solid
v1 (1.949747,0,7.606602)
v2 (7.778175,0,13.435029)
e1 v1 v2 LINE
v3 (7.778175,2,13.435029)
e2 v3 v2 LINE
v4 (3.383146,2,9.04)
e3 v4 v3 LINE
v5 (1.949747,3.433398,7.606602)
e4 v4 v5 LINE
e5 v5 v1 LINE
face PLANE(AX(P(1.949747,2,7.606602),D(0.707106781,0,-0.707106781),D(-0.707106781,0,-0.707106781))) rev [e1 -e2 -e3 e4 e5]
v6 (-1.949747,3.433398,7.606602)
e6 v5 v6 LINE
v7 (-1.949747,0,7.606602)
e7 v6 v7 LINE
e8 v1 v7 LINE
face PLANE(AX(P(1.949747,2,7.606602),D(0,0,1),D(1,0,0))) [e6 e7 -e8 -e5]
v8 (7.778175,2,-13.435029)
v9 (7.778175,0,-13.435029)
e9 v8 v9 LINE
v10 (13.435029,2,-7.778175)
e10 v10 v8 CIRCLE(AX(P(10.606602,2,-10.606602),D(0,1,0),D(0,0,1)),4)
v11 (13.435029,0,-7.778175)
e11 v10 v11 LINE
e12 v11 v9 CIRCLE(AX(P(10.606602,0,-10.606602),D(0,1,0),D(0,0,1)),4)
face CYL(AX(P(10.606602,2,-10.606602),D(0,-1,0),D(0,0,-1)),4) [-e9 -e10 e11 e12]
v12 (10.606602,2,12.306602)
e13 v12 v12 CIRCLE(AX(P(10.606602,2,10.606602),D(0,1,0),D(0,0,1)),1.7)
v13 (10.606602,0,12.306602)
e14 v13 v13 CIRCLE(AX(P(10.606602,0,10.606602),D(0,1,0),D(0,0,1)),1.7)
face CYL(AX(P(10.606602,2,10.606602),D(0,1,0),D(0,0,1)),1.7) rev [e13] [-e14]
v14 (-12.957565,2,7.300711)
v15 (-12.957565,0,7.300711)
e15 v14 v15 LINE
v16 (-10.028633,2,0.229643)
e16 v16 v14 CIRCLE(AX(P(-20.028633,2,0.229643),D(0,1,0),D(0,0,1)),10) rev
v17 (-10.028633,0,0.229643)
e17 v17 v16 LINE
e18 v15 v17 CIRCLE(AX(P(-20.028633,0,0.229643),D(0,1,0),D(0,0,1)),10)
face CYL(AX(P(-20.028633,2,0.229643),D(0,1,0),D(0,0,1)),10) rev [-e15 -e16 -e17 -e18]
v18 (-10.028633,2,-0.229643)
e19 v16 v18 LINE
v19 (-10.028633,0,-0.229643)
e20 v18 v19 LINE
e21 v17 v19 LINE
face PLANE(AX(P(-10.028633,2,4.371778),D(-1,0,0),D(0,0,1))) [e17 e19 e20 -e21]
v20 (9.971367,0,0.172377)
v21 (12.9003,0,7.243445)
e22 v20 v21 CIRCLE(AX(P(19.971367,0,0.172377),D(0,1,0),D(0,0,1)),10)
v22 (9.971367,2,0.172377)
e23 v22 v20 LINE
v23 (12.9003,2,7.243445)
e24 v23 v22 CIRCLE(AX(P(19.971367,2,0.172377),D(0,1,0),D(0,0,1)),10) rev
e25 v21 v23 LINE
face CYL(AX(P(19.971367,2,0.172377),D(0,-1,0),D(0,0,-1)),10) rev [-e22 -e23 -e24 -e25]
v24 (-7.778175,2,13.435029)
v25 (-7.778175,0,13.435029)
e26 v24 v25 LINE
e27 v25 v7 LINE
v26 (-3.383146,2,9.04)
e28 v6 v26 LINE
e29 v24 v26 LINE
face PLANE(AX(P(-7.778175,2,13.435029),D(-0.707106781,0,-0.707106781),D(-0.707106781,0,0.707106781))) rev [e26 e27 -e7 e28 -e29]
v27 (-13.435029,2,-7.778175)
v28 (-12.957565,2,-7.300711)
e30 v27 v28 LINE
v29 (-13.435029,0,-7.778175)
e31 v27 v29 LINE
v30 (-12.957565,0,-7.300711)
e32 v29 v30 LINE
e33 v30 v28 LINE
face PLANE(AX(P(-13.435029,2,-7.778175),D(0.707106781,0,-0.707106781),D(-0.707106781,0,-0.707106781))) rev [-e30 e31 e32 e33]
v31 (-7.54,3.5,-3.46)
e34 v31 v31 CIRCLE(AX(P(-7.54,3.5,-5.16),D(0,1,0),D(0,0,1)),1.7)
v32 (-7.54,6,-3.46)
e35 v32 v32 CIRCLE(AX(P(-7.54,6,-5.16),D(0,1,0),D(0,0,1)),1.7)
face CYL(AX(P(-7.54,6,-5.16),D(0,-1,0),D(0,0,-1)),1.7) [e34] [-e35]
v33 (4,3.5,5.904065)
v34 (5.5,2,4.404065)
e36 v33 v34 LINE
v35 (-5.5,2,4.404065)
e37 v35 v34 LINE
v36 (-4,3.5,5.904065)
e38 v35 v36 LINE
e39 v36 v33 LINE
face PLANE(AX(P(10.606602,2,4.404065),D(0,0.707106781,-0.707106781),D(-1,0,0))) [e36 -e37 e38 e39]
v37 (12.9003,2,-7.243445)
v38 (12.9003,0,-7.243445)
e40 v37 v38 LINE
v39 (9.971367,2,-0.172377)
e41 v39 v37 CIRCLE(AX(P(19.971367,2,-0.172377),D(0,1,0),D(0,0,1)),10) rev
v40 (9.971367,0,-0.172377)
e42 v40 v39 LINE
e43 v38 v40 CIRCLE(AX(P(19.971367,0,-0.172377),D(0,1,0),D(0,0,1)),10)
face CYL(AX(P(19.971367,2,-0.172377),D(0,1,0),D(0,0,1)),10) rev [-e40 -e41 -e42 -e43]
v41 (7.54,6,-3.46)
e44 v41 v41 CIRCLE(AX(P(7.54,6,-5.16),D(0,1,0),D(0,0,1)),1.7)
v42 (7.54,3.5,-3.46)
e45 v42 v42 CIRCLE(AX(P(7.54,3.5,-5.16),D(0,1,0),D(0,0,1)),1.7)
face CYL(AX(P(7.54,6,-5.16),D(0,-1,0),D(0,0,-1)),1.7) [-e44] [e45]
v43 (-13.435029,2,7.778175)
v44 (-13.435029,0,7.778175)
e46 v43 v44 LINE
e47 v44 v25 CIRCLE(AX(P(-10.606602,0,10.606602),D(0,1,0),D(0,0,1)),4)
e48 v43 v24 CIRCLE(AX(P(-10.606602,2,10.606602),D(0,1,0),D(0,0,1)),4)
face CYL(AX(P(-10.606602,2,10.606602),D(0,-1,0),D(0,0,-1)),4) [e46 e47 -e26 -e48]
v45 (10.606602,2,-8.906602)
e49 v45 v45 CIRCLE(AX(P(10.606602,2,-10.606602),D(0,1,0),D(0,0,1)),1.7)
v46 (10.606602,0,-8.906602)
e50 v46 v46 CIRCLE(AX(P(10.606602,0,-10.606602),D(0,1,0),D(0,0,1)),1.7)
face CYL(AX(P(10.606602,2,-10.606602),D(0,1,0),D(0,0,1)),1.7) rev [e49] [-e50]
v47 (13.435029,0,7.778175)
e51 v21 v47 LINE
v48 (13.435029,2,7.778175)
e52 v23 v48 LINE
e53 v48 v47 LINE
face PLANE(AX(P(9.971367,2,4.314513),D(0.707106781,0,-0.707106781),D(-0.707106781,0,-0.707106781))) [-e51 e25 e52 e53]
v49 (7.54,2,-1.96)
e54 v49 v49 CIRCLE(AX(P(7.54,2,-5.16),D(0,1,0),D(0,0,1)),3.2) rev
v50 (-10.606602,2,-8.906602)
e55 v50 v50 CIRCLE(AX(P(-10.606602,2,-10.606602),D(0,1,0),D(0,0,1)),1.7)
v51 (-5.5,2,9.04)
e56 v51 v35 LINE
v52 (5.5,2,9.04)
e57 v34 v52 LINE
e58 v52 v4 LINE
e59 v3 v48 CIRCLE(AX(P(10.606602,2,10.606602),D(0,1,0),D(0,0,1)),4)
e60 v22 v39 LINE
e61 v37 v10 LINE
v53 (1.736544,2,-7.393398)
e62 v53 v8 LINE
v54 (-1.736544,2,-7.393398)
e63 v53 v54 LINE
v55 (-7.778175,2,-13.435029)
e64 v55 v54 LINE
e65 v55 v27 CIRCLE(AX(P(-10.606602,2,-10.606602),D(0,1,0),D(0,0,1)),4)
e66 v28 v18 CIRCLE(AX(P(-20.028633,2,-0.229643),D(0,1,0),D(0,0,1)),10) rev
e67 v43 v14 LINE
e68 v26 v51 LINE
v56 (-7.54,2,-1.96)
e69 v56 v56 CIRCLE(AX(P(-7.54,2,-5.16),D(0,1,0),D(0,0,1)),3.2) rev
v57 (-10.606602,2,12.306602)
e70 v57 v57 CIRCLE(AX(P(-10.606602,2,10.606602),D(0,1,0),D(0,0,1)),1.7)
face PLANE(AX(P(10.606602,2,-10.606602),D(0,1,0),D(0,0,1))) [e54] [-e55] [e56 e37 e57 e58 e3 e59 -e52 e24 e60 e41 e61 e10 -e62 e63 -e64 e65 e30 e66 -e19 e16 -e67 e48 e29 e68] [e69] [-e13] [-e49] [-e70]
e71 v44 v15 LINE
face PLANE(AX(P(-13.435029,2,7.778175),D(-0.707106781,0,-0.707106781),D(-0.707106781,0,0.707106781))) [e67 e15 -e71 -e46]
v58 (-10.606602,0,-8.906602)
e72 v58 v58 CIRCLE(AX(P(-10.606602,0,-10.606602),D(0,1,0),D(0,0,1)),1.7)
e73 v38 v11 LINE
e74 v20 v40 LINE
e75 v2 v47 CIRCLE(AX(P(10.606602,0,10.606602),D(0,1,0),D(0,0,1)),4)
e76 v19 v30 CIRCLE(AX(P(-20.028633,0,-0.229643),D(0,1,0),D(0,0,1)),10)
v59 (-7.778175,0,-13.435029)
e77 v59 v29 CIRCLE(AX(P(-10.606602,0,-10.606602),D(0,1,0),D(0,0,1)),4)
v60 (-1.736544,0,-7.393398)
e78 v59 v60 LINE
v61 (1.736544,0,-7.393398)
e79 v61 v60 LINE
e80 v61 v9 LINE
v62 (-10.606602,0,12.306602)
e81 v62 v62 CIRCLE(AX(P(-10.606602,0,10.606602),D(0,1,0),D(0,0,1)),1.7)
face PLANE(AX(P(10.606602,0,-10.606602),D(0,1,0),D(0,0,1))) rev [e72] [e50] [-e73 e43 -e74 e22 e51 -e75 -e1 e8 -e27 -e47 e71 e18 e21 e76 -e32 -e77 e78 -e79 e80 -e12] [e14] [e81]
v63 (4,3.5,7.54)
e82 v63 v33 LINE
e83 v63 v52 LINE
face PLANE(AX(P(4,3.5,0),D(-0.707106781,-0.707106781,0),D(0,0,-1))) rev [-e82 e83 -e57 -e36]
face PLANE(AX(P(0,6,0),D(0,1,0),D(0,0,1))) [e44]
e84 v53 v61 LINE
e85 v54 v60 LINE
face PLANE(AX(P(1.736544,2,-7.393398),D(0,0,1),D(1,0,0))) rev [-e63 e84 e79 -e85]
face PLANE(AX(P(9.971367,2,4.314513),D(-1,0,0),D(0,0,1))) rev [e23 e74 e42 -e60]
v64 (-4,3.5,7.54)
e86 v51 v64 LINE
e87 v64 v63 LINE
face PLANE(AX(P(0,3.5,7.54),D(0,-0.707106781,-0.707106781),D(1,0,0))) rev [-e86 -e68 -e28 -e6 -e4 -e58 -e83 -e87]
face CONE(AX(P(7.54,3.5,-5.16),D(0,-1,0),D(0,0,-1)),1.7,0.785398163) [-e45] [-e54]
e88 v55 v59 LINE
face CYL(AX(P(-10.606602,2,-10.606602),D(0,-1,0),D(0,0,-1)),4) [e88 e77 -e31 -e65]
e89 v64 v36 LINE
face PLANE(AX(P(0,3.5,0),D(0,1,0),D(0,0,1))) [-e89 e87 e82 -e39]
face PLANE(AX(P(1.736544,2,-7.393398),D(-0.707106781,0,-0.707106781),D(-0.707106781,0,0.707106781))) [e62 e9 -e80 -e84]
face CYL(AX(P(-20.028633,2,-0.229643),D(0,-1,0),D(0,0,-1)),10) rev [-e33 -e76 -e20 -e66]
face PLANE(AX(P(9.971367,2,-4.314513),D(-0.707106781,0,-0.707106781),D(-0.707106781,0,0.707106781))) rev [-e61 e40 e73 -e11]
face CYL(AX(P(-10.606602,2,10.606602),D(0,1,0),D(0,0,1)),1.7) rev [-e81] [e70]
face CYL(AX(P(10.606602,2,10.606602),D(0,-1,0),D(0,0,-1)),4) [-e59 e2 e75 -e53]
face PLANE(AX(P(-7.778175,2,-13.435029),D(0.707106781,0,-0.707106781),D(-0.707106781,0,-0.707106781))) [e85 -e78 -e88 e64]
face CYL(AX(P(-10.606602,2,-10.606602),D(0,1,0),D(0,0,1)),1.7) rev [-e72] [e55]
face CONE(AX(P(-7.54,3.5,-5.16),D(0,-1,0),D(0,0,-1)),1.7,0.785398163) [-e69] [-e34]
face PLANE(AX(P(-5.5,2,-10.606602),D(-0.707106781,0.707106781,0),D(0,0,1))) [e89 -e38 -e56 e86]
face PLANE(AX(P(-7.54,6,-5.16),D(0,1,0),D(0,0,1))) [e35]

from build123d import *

# Parameters (mm, degrees)
BOSS_EXTRUDE1_DEPTH  = 2
M3_CLEARANCE_HOLE1_D = 3.4
SKETCH5_R            = 1.7
BOSS_EXTRUDE2_DEPTH  = 4
FILLET1_R            = 10
BOSS_EXTRUDE3_DEPTH  = 1.5
CHAMFER1_SIZE        = 1.5
CHAMFER2_SIZE        = 1.5


with BuildPart() as part:
    # Sketch2 → Boss-Extrude1 (new body)
    with BuildSketch(Plane(origin=(0, 0, 0), x_dir=(1, 0, 0), z_dir=(0, 1, 0))):
        with BuildLine():
            Line((-13.435028843, 7.778174593), (-10.02863265, 4.371778401))
            Line((-10.02863265, 4.371778401), (-10.02863265, -4.371778401))
            Line((-10.02863265, -4.371778401), (-13.435028843, -7.778174593))
            ThreePointArc((-13.435028843, -7.778174593), (-13.435028843, -13.435028843), (-7.778174593, -13.435028843))
            Line((-7.778174593, -13.435028843), (-1.949747468, -7.606601718))
            Line((-1.949747468, -7.606601718), (1.949747468, -7.606601718))
            Line((1.949747468, -7.606601718), (7.778174593, -13.435028843))
            ThreePointArc((7.778174593, -13.435028843), (13.435028843, -13.435028843), (13.435028843, -7.778174593))
            Line((13.435028843, -7.778174593), (9.97136735, -4.3145131))
            Line((9.97136735, -4.3145131), (9.97136735, 4.3145131))
            Line((9.97136735, 4.3145131), (13.435028843, 7.778174593))
            ThreePointArc((13.435028843, 7.778174593), (13.435028843, 13.435028843), (7.778174593, 13.435028843))
            Line((7.778174593, 13.435028843), (1.736544033, 7.393398282))
            Line((1.736544033, 7.393398282), (-1.736544033, 7.393398282))
            Line((-1.736544033, 7.393398282), (-7.778174593, 13.435028843))
            ThreePointArc((-7.778174593, 13.435028843), (-13.435028843, 13.435028843), (-13.435028843, 7.778174593))
        make_face()
    extrude(amount=BOSS_EXTRUDE1_DEPTH)

    # M3 Clearance Hole1 (through all)
    with Locations(Plane(origin=(0, 2, 0), x_dir=(1, 0, 0), z_dir=(0, 1, 0))):
        with Locations((-10.606601718, -10.606601718), (10.606601718, -10.606601718), (10.606601718, 10.606601718), (-10.606601718, 10.606601718)):
            Hole(M3_CLEARANCE_HOLE1_D / 2)

    # Sketch5 → Boss-Extrude2 (add)
    with BuildSketch(Plane(origin=(0, 2, 0), x_dir=(1, 0, 0), z_dir=(0, 1, 0))):
        with Locations(Location((-7.54, 5.16, 0), (0, 0, 270))):
            Circle(SKETCH5_R)
        with Locations(Location((7.54, 5.16, 0), (0, 0, 270))):
            Circle(SKETCH5_R)
    extrude(amount=BOSS_EXTRUDE2_DEPTH)

    # Fillet1
    fillet1_edges = [part.edges().sort_by_distance(p)[0] for p in [
        (-10.02863265, 1, -4.371778401),
        (-10.02863265, 1, 4.371778401),
        (9.97136735, 1, 4.3145131),
        (9.97136735, 1, -4.3145131),
    ]]
    fillet(fillet1_edges, radius=FILLET1_R)

    # Sketch5<3> → Boss-Extrude3 (add)
    with BuildSketch(Plane(origin=(0, 2, 0), x_dir=(1, 0, 0), z_dir=(0, 1, 0))):
        Polygon((-4, -5.90406477), (-4, -7.54), (0, -7.54), (4, -7.54), (4, -5.90406477), align=None)
    extrude(amount=BOSS_EXTRUDE3_DEPTH)

    # Chamfer1
    chamfer1_edges = [part.edges().sort_by_distance(p)[0] for p in [
        (7.54, 2, -6.86),
        (-7.54, 2, -6.86),
    ]]
    chamfer(chamfer1_edges, length=CHAMFER1_SIZE)

    # Chamfer2
    # the kernel refuses this chamfer: 1.5 mm, written as the material it adds along each edge
    with BuildSketch(Plane(origin=(7.857524482, 2, 5.90406477), x_dir=(0, 0, -1), z_dir=(-1, 0, 0))) as chamfer2_piece_1_section:
        Polygon((CHAMFER2_SIZE, 0), (0, -CHAMFER2_SIZE), (0, 0), align=None)
    chamfer2_piece_1 = extrude(amount=15.715048964, mode=Mode.PRIVATE)
    chamfer2_piece_1 = split(chamfer2_piece_1, bisect_by=Plane(origin=(1.178762241, 8.678762241, 5.90406477), z_dir=(0.7071067811865476, -0.7071067811865476, 0)), keep=Keep.TOP, mode=Mode.PRIVATE)
    chamfer2_piece_1 = split(chamfer2_piece_1, bisect_by=Plane(origin=(6.678762241, 0.821237759, 5.90406477), z_dir=(-0.7071067811865476, -0.7071067811865476, 0)), keep=Keep.TOP, mode=Mode.PRIVATE)
    add(chamfer2_piece_1)
    with BuildSketch(Plane(origin=(-4, 2, 2.046540288), x_dir=(-1, 0, 0), z_dir=(0, 0, 1))) as chamfer2_piece_2_section:
        Polygon((CHAMFER2_SIZE, 0), (0, -CHAMFER2_SIZE), (0, 0), align=None)
    chamfer2_piece_2 = extrude(amount=9.350984194, mode=Mode.PRIVATE)
    chamfer2_piece_2 = split(chamfer2_piece_2, bisect_by=Plane(origin=(-4, 5.496729856, 5.543270144), z_dir=(0, -0.7071067811865474, -0.7071067811865477)), keep=Keep.TOP, mode=Mode.PRIVATE)
    chamfer2_piece_2 = split(chamfer2_piece_2, bisect_by=Plane(origin=(-4, 0.821237759, 3.225302529), z_dir=(0, -0.7071067811865476, 0.7071067811865476)), keep=Keep.TOP, mode=Mode.PRIVATE)
    add(chamfer2_piece_2)
    with BuildSketch(Plane(origin=(-7.857524482, 2, 7.54), x_dir=(0, 0, 1), z_dir=(1, 0, 0))) as chamfer2_piece_3_section:
        Polygon((CHAMFER2_SIZE, 0), (0, -CHAMFER2_SIZE), (0, 0), align=None)
    chamfer2_piece_3 = extrude(amount=15.715048964, mode=Mode.PRIVATE)
    chamfer2_piece_3 = split(chamfer2_piece_3, bisect_by=Plane(origin=(-4.870335116, 2, 10.527189366), z_dir=(-0.7071067811865475, 0, -0.7071067811865476)), keep=Keep.TOP, mode=Mode.PRIVATE)
    chamfer2_piece_3 = split(chamfer2_piece_3, bisect_by=Plane(origin=(-6.678762241, 0.821237759, 7.54), z_dir=(0.7071067811865476, -0.7071067811865476, 0)), keep=Keep.TOP, mode=Mode.PRIVATE)
    add(chamfer2_piece_3)
    with BuildSketch(Plane(origin=(-7.857524482, 2, 7.54), x_dir=(0, 0, 1), z_dir=(1, 0, 0))) as chamfer2_piece_4_section:
        Polygon((CHAMFER2_SIZE, 0), (0, -CHAMFER2_SIZE), (0, 0), align=None)
    chamfer2_piece_4 = extrude(amount=15.715048964, mode=Mode.PRIVATE)
    chamfer2_piece_4 = split(chamfer2_piece_4, bisect_by=Plane(origin=(-7.857524482, 2, 7.606601718), z_dir=(0, 0, -1)), keep=Keep.TOP, mode=Mode.PRIVATE)
    chamfer2_piece_4 = split(chamfer2_piece_4, bisect_by=Plane(origin=(-6.678762241, 0.821237759, 7.54), z_dir=(0.7071067811865476, -0.7071067811865476, 0)), keep=Keep.TOP, mode=Mode.PRIVATE)
    chamfer2_piece_4 = split(chamfer2_piece_4, bisect_by=Plane(origin=(-1.178762241, 8.678762241, 7.54), z_dir=(-0.7071067811865476, -0.7071067811865476, 0)), keep=Keep.TOP, mode=Mode.PRIVATE)
    add(chamfer2_piece_4)
    with BuildSketch(Plane(origin=(-7.857524482, 2, 7.54), x_dir=(0, 0, 1), z_dir=(1, 0, 0))) as chamfer2_piece_5_section:
        Polygon((CHAMFER2_SIZE, 0), (0, -CHAMFER2_SIZE), (0, 0), align=None)
    chamfer2_piece_5 = extrude(amount=15.715048964, mode=Mode.PRIVATE)
    chamfer2_piece_5 = split(chamfer2_piece_5, bisect_by=Plane(origin=(-2.987189366, 2, 2.669664884), z_dir=(0.7071067811865515, 0, -0.7071067811865437)), keep=Keep.TOP, mode=Mode.PRIVATE)
    chamfer2_piece_5 = split(chamfer2_piece_5, bisect_by=Plane(origin=(-1.178762241, 8.678762241, 7.54), z_dir=(-0.7071067811865476, -0.7071067811865476, 0)), keep=Keep.TOP, mode=Mode.PRIVATE)
    add(chamfer2_piece_5)
    with BuildSketch(Plane(origin=(4, 2, 11.397524482), x_dir=(1, 0, 0), z_dir=(0, 0, -1))) as chamfer2_piece_6_section:
        Polygon((CHAMFER2_SIZE, 0), (0, -CHAMFER2_SIZE), (0, 0), align=None)
    chamfer2_piece_6 = extrude(amount=9.350984194, mode=Mode.PRIVATE)
    chamfer2_piece_6 = split(chamfer2_piece_6, bisect_by=Plane(origin=(4, 0.821237759, 10.218762241), z_dir=(0, -0.7071067811865474, -0.7071067811865477)), keep=Keep.TOP, mode=Mode.PRIVATE)
    chamfer2_piece_6 = split(chamfer2_piece_6, bisect_by=Plane(origin=(4, 5.496729856, 7.900794626), z_dir=(0, -0.7071067811865476, 0.7071067811865476)), keep=Keep.TOP, mode=Mode.PRIVATE)
    add(chamfer2_piece_6)


solid = part.part
